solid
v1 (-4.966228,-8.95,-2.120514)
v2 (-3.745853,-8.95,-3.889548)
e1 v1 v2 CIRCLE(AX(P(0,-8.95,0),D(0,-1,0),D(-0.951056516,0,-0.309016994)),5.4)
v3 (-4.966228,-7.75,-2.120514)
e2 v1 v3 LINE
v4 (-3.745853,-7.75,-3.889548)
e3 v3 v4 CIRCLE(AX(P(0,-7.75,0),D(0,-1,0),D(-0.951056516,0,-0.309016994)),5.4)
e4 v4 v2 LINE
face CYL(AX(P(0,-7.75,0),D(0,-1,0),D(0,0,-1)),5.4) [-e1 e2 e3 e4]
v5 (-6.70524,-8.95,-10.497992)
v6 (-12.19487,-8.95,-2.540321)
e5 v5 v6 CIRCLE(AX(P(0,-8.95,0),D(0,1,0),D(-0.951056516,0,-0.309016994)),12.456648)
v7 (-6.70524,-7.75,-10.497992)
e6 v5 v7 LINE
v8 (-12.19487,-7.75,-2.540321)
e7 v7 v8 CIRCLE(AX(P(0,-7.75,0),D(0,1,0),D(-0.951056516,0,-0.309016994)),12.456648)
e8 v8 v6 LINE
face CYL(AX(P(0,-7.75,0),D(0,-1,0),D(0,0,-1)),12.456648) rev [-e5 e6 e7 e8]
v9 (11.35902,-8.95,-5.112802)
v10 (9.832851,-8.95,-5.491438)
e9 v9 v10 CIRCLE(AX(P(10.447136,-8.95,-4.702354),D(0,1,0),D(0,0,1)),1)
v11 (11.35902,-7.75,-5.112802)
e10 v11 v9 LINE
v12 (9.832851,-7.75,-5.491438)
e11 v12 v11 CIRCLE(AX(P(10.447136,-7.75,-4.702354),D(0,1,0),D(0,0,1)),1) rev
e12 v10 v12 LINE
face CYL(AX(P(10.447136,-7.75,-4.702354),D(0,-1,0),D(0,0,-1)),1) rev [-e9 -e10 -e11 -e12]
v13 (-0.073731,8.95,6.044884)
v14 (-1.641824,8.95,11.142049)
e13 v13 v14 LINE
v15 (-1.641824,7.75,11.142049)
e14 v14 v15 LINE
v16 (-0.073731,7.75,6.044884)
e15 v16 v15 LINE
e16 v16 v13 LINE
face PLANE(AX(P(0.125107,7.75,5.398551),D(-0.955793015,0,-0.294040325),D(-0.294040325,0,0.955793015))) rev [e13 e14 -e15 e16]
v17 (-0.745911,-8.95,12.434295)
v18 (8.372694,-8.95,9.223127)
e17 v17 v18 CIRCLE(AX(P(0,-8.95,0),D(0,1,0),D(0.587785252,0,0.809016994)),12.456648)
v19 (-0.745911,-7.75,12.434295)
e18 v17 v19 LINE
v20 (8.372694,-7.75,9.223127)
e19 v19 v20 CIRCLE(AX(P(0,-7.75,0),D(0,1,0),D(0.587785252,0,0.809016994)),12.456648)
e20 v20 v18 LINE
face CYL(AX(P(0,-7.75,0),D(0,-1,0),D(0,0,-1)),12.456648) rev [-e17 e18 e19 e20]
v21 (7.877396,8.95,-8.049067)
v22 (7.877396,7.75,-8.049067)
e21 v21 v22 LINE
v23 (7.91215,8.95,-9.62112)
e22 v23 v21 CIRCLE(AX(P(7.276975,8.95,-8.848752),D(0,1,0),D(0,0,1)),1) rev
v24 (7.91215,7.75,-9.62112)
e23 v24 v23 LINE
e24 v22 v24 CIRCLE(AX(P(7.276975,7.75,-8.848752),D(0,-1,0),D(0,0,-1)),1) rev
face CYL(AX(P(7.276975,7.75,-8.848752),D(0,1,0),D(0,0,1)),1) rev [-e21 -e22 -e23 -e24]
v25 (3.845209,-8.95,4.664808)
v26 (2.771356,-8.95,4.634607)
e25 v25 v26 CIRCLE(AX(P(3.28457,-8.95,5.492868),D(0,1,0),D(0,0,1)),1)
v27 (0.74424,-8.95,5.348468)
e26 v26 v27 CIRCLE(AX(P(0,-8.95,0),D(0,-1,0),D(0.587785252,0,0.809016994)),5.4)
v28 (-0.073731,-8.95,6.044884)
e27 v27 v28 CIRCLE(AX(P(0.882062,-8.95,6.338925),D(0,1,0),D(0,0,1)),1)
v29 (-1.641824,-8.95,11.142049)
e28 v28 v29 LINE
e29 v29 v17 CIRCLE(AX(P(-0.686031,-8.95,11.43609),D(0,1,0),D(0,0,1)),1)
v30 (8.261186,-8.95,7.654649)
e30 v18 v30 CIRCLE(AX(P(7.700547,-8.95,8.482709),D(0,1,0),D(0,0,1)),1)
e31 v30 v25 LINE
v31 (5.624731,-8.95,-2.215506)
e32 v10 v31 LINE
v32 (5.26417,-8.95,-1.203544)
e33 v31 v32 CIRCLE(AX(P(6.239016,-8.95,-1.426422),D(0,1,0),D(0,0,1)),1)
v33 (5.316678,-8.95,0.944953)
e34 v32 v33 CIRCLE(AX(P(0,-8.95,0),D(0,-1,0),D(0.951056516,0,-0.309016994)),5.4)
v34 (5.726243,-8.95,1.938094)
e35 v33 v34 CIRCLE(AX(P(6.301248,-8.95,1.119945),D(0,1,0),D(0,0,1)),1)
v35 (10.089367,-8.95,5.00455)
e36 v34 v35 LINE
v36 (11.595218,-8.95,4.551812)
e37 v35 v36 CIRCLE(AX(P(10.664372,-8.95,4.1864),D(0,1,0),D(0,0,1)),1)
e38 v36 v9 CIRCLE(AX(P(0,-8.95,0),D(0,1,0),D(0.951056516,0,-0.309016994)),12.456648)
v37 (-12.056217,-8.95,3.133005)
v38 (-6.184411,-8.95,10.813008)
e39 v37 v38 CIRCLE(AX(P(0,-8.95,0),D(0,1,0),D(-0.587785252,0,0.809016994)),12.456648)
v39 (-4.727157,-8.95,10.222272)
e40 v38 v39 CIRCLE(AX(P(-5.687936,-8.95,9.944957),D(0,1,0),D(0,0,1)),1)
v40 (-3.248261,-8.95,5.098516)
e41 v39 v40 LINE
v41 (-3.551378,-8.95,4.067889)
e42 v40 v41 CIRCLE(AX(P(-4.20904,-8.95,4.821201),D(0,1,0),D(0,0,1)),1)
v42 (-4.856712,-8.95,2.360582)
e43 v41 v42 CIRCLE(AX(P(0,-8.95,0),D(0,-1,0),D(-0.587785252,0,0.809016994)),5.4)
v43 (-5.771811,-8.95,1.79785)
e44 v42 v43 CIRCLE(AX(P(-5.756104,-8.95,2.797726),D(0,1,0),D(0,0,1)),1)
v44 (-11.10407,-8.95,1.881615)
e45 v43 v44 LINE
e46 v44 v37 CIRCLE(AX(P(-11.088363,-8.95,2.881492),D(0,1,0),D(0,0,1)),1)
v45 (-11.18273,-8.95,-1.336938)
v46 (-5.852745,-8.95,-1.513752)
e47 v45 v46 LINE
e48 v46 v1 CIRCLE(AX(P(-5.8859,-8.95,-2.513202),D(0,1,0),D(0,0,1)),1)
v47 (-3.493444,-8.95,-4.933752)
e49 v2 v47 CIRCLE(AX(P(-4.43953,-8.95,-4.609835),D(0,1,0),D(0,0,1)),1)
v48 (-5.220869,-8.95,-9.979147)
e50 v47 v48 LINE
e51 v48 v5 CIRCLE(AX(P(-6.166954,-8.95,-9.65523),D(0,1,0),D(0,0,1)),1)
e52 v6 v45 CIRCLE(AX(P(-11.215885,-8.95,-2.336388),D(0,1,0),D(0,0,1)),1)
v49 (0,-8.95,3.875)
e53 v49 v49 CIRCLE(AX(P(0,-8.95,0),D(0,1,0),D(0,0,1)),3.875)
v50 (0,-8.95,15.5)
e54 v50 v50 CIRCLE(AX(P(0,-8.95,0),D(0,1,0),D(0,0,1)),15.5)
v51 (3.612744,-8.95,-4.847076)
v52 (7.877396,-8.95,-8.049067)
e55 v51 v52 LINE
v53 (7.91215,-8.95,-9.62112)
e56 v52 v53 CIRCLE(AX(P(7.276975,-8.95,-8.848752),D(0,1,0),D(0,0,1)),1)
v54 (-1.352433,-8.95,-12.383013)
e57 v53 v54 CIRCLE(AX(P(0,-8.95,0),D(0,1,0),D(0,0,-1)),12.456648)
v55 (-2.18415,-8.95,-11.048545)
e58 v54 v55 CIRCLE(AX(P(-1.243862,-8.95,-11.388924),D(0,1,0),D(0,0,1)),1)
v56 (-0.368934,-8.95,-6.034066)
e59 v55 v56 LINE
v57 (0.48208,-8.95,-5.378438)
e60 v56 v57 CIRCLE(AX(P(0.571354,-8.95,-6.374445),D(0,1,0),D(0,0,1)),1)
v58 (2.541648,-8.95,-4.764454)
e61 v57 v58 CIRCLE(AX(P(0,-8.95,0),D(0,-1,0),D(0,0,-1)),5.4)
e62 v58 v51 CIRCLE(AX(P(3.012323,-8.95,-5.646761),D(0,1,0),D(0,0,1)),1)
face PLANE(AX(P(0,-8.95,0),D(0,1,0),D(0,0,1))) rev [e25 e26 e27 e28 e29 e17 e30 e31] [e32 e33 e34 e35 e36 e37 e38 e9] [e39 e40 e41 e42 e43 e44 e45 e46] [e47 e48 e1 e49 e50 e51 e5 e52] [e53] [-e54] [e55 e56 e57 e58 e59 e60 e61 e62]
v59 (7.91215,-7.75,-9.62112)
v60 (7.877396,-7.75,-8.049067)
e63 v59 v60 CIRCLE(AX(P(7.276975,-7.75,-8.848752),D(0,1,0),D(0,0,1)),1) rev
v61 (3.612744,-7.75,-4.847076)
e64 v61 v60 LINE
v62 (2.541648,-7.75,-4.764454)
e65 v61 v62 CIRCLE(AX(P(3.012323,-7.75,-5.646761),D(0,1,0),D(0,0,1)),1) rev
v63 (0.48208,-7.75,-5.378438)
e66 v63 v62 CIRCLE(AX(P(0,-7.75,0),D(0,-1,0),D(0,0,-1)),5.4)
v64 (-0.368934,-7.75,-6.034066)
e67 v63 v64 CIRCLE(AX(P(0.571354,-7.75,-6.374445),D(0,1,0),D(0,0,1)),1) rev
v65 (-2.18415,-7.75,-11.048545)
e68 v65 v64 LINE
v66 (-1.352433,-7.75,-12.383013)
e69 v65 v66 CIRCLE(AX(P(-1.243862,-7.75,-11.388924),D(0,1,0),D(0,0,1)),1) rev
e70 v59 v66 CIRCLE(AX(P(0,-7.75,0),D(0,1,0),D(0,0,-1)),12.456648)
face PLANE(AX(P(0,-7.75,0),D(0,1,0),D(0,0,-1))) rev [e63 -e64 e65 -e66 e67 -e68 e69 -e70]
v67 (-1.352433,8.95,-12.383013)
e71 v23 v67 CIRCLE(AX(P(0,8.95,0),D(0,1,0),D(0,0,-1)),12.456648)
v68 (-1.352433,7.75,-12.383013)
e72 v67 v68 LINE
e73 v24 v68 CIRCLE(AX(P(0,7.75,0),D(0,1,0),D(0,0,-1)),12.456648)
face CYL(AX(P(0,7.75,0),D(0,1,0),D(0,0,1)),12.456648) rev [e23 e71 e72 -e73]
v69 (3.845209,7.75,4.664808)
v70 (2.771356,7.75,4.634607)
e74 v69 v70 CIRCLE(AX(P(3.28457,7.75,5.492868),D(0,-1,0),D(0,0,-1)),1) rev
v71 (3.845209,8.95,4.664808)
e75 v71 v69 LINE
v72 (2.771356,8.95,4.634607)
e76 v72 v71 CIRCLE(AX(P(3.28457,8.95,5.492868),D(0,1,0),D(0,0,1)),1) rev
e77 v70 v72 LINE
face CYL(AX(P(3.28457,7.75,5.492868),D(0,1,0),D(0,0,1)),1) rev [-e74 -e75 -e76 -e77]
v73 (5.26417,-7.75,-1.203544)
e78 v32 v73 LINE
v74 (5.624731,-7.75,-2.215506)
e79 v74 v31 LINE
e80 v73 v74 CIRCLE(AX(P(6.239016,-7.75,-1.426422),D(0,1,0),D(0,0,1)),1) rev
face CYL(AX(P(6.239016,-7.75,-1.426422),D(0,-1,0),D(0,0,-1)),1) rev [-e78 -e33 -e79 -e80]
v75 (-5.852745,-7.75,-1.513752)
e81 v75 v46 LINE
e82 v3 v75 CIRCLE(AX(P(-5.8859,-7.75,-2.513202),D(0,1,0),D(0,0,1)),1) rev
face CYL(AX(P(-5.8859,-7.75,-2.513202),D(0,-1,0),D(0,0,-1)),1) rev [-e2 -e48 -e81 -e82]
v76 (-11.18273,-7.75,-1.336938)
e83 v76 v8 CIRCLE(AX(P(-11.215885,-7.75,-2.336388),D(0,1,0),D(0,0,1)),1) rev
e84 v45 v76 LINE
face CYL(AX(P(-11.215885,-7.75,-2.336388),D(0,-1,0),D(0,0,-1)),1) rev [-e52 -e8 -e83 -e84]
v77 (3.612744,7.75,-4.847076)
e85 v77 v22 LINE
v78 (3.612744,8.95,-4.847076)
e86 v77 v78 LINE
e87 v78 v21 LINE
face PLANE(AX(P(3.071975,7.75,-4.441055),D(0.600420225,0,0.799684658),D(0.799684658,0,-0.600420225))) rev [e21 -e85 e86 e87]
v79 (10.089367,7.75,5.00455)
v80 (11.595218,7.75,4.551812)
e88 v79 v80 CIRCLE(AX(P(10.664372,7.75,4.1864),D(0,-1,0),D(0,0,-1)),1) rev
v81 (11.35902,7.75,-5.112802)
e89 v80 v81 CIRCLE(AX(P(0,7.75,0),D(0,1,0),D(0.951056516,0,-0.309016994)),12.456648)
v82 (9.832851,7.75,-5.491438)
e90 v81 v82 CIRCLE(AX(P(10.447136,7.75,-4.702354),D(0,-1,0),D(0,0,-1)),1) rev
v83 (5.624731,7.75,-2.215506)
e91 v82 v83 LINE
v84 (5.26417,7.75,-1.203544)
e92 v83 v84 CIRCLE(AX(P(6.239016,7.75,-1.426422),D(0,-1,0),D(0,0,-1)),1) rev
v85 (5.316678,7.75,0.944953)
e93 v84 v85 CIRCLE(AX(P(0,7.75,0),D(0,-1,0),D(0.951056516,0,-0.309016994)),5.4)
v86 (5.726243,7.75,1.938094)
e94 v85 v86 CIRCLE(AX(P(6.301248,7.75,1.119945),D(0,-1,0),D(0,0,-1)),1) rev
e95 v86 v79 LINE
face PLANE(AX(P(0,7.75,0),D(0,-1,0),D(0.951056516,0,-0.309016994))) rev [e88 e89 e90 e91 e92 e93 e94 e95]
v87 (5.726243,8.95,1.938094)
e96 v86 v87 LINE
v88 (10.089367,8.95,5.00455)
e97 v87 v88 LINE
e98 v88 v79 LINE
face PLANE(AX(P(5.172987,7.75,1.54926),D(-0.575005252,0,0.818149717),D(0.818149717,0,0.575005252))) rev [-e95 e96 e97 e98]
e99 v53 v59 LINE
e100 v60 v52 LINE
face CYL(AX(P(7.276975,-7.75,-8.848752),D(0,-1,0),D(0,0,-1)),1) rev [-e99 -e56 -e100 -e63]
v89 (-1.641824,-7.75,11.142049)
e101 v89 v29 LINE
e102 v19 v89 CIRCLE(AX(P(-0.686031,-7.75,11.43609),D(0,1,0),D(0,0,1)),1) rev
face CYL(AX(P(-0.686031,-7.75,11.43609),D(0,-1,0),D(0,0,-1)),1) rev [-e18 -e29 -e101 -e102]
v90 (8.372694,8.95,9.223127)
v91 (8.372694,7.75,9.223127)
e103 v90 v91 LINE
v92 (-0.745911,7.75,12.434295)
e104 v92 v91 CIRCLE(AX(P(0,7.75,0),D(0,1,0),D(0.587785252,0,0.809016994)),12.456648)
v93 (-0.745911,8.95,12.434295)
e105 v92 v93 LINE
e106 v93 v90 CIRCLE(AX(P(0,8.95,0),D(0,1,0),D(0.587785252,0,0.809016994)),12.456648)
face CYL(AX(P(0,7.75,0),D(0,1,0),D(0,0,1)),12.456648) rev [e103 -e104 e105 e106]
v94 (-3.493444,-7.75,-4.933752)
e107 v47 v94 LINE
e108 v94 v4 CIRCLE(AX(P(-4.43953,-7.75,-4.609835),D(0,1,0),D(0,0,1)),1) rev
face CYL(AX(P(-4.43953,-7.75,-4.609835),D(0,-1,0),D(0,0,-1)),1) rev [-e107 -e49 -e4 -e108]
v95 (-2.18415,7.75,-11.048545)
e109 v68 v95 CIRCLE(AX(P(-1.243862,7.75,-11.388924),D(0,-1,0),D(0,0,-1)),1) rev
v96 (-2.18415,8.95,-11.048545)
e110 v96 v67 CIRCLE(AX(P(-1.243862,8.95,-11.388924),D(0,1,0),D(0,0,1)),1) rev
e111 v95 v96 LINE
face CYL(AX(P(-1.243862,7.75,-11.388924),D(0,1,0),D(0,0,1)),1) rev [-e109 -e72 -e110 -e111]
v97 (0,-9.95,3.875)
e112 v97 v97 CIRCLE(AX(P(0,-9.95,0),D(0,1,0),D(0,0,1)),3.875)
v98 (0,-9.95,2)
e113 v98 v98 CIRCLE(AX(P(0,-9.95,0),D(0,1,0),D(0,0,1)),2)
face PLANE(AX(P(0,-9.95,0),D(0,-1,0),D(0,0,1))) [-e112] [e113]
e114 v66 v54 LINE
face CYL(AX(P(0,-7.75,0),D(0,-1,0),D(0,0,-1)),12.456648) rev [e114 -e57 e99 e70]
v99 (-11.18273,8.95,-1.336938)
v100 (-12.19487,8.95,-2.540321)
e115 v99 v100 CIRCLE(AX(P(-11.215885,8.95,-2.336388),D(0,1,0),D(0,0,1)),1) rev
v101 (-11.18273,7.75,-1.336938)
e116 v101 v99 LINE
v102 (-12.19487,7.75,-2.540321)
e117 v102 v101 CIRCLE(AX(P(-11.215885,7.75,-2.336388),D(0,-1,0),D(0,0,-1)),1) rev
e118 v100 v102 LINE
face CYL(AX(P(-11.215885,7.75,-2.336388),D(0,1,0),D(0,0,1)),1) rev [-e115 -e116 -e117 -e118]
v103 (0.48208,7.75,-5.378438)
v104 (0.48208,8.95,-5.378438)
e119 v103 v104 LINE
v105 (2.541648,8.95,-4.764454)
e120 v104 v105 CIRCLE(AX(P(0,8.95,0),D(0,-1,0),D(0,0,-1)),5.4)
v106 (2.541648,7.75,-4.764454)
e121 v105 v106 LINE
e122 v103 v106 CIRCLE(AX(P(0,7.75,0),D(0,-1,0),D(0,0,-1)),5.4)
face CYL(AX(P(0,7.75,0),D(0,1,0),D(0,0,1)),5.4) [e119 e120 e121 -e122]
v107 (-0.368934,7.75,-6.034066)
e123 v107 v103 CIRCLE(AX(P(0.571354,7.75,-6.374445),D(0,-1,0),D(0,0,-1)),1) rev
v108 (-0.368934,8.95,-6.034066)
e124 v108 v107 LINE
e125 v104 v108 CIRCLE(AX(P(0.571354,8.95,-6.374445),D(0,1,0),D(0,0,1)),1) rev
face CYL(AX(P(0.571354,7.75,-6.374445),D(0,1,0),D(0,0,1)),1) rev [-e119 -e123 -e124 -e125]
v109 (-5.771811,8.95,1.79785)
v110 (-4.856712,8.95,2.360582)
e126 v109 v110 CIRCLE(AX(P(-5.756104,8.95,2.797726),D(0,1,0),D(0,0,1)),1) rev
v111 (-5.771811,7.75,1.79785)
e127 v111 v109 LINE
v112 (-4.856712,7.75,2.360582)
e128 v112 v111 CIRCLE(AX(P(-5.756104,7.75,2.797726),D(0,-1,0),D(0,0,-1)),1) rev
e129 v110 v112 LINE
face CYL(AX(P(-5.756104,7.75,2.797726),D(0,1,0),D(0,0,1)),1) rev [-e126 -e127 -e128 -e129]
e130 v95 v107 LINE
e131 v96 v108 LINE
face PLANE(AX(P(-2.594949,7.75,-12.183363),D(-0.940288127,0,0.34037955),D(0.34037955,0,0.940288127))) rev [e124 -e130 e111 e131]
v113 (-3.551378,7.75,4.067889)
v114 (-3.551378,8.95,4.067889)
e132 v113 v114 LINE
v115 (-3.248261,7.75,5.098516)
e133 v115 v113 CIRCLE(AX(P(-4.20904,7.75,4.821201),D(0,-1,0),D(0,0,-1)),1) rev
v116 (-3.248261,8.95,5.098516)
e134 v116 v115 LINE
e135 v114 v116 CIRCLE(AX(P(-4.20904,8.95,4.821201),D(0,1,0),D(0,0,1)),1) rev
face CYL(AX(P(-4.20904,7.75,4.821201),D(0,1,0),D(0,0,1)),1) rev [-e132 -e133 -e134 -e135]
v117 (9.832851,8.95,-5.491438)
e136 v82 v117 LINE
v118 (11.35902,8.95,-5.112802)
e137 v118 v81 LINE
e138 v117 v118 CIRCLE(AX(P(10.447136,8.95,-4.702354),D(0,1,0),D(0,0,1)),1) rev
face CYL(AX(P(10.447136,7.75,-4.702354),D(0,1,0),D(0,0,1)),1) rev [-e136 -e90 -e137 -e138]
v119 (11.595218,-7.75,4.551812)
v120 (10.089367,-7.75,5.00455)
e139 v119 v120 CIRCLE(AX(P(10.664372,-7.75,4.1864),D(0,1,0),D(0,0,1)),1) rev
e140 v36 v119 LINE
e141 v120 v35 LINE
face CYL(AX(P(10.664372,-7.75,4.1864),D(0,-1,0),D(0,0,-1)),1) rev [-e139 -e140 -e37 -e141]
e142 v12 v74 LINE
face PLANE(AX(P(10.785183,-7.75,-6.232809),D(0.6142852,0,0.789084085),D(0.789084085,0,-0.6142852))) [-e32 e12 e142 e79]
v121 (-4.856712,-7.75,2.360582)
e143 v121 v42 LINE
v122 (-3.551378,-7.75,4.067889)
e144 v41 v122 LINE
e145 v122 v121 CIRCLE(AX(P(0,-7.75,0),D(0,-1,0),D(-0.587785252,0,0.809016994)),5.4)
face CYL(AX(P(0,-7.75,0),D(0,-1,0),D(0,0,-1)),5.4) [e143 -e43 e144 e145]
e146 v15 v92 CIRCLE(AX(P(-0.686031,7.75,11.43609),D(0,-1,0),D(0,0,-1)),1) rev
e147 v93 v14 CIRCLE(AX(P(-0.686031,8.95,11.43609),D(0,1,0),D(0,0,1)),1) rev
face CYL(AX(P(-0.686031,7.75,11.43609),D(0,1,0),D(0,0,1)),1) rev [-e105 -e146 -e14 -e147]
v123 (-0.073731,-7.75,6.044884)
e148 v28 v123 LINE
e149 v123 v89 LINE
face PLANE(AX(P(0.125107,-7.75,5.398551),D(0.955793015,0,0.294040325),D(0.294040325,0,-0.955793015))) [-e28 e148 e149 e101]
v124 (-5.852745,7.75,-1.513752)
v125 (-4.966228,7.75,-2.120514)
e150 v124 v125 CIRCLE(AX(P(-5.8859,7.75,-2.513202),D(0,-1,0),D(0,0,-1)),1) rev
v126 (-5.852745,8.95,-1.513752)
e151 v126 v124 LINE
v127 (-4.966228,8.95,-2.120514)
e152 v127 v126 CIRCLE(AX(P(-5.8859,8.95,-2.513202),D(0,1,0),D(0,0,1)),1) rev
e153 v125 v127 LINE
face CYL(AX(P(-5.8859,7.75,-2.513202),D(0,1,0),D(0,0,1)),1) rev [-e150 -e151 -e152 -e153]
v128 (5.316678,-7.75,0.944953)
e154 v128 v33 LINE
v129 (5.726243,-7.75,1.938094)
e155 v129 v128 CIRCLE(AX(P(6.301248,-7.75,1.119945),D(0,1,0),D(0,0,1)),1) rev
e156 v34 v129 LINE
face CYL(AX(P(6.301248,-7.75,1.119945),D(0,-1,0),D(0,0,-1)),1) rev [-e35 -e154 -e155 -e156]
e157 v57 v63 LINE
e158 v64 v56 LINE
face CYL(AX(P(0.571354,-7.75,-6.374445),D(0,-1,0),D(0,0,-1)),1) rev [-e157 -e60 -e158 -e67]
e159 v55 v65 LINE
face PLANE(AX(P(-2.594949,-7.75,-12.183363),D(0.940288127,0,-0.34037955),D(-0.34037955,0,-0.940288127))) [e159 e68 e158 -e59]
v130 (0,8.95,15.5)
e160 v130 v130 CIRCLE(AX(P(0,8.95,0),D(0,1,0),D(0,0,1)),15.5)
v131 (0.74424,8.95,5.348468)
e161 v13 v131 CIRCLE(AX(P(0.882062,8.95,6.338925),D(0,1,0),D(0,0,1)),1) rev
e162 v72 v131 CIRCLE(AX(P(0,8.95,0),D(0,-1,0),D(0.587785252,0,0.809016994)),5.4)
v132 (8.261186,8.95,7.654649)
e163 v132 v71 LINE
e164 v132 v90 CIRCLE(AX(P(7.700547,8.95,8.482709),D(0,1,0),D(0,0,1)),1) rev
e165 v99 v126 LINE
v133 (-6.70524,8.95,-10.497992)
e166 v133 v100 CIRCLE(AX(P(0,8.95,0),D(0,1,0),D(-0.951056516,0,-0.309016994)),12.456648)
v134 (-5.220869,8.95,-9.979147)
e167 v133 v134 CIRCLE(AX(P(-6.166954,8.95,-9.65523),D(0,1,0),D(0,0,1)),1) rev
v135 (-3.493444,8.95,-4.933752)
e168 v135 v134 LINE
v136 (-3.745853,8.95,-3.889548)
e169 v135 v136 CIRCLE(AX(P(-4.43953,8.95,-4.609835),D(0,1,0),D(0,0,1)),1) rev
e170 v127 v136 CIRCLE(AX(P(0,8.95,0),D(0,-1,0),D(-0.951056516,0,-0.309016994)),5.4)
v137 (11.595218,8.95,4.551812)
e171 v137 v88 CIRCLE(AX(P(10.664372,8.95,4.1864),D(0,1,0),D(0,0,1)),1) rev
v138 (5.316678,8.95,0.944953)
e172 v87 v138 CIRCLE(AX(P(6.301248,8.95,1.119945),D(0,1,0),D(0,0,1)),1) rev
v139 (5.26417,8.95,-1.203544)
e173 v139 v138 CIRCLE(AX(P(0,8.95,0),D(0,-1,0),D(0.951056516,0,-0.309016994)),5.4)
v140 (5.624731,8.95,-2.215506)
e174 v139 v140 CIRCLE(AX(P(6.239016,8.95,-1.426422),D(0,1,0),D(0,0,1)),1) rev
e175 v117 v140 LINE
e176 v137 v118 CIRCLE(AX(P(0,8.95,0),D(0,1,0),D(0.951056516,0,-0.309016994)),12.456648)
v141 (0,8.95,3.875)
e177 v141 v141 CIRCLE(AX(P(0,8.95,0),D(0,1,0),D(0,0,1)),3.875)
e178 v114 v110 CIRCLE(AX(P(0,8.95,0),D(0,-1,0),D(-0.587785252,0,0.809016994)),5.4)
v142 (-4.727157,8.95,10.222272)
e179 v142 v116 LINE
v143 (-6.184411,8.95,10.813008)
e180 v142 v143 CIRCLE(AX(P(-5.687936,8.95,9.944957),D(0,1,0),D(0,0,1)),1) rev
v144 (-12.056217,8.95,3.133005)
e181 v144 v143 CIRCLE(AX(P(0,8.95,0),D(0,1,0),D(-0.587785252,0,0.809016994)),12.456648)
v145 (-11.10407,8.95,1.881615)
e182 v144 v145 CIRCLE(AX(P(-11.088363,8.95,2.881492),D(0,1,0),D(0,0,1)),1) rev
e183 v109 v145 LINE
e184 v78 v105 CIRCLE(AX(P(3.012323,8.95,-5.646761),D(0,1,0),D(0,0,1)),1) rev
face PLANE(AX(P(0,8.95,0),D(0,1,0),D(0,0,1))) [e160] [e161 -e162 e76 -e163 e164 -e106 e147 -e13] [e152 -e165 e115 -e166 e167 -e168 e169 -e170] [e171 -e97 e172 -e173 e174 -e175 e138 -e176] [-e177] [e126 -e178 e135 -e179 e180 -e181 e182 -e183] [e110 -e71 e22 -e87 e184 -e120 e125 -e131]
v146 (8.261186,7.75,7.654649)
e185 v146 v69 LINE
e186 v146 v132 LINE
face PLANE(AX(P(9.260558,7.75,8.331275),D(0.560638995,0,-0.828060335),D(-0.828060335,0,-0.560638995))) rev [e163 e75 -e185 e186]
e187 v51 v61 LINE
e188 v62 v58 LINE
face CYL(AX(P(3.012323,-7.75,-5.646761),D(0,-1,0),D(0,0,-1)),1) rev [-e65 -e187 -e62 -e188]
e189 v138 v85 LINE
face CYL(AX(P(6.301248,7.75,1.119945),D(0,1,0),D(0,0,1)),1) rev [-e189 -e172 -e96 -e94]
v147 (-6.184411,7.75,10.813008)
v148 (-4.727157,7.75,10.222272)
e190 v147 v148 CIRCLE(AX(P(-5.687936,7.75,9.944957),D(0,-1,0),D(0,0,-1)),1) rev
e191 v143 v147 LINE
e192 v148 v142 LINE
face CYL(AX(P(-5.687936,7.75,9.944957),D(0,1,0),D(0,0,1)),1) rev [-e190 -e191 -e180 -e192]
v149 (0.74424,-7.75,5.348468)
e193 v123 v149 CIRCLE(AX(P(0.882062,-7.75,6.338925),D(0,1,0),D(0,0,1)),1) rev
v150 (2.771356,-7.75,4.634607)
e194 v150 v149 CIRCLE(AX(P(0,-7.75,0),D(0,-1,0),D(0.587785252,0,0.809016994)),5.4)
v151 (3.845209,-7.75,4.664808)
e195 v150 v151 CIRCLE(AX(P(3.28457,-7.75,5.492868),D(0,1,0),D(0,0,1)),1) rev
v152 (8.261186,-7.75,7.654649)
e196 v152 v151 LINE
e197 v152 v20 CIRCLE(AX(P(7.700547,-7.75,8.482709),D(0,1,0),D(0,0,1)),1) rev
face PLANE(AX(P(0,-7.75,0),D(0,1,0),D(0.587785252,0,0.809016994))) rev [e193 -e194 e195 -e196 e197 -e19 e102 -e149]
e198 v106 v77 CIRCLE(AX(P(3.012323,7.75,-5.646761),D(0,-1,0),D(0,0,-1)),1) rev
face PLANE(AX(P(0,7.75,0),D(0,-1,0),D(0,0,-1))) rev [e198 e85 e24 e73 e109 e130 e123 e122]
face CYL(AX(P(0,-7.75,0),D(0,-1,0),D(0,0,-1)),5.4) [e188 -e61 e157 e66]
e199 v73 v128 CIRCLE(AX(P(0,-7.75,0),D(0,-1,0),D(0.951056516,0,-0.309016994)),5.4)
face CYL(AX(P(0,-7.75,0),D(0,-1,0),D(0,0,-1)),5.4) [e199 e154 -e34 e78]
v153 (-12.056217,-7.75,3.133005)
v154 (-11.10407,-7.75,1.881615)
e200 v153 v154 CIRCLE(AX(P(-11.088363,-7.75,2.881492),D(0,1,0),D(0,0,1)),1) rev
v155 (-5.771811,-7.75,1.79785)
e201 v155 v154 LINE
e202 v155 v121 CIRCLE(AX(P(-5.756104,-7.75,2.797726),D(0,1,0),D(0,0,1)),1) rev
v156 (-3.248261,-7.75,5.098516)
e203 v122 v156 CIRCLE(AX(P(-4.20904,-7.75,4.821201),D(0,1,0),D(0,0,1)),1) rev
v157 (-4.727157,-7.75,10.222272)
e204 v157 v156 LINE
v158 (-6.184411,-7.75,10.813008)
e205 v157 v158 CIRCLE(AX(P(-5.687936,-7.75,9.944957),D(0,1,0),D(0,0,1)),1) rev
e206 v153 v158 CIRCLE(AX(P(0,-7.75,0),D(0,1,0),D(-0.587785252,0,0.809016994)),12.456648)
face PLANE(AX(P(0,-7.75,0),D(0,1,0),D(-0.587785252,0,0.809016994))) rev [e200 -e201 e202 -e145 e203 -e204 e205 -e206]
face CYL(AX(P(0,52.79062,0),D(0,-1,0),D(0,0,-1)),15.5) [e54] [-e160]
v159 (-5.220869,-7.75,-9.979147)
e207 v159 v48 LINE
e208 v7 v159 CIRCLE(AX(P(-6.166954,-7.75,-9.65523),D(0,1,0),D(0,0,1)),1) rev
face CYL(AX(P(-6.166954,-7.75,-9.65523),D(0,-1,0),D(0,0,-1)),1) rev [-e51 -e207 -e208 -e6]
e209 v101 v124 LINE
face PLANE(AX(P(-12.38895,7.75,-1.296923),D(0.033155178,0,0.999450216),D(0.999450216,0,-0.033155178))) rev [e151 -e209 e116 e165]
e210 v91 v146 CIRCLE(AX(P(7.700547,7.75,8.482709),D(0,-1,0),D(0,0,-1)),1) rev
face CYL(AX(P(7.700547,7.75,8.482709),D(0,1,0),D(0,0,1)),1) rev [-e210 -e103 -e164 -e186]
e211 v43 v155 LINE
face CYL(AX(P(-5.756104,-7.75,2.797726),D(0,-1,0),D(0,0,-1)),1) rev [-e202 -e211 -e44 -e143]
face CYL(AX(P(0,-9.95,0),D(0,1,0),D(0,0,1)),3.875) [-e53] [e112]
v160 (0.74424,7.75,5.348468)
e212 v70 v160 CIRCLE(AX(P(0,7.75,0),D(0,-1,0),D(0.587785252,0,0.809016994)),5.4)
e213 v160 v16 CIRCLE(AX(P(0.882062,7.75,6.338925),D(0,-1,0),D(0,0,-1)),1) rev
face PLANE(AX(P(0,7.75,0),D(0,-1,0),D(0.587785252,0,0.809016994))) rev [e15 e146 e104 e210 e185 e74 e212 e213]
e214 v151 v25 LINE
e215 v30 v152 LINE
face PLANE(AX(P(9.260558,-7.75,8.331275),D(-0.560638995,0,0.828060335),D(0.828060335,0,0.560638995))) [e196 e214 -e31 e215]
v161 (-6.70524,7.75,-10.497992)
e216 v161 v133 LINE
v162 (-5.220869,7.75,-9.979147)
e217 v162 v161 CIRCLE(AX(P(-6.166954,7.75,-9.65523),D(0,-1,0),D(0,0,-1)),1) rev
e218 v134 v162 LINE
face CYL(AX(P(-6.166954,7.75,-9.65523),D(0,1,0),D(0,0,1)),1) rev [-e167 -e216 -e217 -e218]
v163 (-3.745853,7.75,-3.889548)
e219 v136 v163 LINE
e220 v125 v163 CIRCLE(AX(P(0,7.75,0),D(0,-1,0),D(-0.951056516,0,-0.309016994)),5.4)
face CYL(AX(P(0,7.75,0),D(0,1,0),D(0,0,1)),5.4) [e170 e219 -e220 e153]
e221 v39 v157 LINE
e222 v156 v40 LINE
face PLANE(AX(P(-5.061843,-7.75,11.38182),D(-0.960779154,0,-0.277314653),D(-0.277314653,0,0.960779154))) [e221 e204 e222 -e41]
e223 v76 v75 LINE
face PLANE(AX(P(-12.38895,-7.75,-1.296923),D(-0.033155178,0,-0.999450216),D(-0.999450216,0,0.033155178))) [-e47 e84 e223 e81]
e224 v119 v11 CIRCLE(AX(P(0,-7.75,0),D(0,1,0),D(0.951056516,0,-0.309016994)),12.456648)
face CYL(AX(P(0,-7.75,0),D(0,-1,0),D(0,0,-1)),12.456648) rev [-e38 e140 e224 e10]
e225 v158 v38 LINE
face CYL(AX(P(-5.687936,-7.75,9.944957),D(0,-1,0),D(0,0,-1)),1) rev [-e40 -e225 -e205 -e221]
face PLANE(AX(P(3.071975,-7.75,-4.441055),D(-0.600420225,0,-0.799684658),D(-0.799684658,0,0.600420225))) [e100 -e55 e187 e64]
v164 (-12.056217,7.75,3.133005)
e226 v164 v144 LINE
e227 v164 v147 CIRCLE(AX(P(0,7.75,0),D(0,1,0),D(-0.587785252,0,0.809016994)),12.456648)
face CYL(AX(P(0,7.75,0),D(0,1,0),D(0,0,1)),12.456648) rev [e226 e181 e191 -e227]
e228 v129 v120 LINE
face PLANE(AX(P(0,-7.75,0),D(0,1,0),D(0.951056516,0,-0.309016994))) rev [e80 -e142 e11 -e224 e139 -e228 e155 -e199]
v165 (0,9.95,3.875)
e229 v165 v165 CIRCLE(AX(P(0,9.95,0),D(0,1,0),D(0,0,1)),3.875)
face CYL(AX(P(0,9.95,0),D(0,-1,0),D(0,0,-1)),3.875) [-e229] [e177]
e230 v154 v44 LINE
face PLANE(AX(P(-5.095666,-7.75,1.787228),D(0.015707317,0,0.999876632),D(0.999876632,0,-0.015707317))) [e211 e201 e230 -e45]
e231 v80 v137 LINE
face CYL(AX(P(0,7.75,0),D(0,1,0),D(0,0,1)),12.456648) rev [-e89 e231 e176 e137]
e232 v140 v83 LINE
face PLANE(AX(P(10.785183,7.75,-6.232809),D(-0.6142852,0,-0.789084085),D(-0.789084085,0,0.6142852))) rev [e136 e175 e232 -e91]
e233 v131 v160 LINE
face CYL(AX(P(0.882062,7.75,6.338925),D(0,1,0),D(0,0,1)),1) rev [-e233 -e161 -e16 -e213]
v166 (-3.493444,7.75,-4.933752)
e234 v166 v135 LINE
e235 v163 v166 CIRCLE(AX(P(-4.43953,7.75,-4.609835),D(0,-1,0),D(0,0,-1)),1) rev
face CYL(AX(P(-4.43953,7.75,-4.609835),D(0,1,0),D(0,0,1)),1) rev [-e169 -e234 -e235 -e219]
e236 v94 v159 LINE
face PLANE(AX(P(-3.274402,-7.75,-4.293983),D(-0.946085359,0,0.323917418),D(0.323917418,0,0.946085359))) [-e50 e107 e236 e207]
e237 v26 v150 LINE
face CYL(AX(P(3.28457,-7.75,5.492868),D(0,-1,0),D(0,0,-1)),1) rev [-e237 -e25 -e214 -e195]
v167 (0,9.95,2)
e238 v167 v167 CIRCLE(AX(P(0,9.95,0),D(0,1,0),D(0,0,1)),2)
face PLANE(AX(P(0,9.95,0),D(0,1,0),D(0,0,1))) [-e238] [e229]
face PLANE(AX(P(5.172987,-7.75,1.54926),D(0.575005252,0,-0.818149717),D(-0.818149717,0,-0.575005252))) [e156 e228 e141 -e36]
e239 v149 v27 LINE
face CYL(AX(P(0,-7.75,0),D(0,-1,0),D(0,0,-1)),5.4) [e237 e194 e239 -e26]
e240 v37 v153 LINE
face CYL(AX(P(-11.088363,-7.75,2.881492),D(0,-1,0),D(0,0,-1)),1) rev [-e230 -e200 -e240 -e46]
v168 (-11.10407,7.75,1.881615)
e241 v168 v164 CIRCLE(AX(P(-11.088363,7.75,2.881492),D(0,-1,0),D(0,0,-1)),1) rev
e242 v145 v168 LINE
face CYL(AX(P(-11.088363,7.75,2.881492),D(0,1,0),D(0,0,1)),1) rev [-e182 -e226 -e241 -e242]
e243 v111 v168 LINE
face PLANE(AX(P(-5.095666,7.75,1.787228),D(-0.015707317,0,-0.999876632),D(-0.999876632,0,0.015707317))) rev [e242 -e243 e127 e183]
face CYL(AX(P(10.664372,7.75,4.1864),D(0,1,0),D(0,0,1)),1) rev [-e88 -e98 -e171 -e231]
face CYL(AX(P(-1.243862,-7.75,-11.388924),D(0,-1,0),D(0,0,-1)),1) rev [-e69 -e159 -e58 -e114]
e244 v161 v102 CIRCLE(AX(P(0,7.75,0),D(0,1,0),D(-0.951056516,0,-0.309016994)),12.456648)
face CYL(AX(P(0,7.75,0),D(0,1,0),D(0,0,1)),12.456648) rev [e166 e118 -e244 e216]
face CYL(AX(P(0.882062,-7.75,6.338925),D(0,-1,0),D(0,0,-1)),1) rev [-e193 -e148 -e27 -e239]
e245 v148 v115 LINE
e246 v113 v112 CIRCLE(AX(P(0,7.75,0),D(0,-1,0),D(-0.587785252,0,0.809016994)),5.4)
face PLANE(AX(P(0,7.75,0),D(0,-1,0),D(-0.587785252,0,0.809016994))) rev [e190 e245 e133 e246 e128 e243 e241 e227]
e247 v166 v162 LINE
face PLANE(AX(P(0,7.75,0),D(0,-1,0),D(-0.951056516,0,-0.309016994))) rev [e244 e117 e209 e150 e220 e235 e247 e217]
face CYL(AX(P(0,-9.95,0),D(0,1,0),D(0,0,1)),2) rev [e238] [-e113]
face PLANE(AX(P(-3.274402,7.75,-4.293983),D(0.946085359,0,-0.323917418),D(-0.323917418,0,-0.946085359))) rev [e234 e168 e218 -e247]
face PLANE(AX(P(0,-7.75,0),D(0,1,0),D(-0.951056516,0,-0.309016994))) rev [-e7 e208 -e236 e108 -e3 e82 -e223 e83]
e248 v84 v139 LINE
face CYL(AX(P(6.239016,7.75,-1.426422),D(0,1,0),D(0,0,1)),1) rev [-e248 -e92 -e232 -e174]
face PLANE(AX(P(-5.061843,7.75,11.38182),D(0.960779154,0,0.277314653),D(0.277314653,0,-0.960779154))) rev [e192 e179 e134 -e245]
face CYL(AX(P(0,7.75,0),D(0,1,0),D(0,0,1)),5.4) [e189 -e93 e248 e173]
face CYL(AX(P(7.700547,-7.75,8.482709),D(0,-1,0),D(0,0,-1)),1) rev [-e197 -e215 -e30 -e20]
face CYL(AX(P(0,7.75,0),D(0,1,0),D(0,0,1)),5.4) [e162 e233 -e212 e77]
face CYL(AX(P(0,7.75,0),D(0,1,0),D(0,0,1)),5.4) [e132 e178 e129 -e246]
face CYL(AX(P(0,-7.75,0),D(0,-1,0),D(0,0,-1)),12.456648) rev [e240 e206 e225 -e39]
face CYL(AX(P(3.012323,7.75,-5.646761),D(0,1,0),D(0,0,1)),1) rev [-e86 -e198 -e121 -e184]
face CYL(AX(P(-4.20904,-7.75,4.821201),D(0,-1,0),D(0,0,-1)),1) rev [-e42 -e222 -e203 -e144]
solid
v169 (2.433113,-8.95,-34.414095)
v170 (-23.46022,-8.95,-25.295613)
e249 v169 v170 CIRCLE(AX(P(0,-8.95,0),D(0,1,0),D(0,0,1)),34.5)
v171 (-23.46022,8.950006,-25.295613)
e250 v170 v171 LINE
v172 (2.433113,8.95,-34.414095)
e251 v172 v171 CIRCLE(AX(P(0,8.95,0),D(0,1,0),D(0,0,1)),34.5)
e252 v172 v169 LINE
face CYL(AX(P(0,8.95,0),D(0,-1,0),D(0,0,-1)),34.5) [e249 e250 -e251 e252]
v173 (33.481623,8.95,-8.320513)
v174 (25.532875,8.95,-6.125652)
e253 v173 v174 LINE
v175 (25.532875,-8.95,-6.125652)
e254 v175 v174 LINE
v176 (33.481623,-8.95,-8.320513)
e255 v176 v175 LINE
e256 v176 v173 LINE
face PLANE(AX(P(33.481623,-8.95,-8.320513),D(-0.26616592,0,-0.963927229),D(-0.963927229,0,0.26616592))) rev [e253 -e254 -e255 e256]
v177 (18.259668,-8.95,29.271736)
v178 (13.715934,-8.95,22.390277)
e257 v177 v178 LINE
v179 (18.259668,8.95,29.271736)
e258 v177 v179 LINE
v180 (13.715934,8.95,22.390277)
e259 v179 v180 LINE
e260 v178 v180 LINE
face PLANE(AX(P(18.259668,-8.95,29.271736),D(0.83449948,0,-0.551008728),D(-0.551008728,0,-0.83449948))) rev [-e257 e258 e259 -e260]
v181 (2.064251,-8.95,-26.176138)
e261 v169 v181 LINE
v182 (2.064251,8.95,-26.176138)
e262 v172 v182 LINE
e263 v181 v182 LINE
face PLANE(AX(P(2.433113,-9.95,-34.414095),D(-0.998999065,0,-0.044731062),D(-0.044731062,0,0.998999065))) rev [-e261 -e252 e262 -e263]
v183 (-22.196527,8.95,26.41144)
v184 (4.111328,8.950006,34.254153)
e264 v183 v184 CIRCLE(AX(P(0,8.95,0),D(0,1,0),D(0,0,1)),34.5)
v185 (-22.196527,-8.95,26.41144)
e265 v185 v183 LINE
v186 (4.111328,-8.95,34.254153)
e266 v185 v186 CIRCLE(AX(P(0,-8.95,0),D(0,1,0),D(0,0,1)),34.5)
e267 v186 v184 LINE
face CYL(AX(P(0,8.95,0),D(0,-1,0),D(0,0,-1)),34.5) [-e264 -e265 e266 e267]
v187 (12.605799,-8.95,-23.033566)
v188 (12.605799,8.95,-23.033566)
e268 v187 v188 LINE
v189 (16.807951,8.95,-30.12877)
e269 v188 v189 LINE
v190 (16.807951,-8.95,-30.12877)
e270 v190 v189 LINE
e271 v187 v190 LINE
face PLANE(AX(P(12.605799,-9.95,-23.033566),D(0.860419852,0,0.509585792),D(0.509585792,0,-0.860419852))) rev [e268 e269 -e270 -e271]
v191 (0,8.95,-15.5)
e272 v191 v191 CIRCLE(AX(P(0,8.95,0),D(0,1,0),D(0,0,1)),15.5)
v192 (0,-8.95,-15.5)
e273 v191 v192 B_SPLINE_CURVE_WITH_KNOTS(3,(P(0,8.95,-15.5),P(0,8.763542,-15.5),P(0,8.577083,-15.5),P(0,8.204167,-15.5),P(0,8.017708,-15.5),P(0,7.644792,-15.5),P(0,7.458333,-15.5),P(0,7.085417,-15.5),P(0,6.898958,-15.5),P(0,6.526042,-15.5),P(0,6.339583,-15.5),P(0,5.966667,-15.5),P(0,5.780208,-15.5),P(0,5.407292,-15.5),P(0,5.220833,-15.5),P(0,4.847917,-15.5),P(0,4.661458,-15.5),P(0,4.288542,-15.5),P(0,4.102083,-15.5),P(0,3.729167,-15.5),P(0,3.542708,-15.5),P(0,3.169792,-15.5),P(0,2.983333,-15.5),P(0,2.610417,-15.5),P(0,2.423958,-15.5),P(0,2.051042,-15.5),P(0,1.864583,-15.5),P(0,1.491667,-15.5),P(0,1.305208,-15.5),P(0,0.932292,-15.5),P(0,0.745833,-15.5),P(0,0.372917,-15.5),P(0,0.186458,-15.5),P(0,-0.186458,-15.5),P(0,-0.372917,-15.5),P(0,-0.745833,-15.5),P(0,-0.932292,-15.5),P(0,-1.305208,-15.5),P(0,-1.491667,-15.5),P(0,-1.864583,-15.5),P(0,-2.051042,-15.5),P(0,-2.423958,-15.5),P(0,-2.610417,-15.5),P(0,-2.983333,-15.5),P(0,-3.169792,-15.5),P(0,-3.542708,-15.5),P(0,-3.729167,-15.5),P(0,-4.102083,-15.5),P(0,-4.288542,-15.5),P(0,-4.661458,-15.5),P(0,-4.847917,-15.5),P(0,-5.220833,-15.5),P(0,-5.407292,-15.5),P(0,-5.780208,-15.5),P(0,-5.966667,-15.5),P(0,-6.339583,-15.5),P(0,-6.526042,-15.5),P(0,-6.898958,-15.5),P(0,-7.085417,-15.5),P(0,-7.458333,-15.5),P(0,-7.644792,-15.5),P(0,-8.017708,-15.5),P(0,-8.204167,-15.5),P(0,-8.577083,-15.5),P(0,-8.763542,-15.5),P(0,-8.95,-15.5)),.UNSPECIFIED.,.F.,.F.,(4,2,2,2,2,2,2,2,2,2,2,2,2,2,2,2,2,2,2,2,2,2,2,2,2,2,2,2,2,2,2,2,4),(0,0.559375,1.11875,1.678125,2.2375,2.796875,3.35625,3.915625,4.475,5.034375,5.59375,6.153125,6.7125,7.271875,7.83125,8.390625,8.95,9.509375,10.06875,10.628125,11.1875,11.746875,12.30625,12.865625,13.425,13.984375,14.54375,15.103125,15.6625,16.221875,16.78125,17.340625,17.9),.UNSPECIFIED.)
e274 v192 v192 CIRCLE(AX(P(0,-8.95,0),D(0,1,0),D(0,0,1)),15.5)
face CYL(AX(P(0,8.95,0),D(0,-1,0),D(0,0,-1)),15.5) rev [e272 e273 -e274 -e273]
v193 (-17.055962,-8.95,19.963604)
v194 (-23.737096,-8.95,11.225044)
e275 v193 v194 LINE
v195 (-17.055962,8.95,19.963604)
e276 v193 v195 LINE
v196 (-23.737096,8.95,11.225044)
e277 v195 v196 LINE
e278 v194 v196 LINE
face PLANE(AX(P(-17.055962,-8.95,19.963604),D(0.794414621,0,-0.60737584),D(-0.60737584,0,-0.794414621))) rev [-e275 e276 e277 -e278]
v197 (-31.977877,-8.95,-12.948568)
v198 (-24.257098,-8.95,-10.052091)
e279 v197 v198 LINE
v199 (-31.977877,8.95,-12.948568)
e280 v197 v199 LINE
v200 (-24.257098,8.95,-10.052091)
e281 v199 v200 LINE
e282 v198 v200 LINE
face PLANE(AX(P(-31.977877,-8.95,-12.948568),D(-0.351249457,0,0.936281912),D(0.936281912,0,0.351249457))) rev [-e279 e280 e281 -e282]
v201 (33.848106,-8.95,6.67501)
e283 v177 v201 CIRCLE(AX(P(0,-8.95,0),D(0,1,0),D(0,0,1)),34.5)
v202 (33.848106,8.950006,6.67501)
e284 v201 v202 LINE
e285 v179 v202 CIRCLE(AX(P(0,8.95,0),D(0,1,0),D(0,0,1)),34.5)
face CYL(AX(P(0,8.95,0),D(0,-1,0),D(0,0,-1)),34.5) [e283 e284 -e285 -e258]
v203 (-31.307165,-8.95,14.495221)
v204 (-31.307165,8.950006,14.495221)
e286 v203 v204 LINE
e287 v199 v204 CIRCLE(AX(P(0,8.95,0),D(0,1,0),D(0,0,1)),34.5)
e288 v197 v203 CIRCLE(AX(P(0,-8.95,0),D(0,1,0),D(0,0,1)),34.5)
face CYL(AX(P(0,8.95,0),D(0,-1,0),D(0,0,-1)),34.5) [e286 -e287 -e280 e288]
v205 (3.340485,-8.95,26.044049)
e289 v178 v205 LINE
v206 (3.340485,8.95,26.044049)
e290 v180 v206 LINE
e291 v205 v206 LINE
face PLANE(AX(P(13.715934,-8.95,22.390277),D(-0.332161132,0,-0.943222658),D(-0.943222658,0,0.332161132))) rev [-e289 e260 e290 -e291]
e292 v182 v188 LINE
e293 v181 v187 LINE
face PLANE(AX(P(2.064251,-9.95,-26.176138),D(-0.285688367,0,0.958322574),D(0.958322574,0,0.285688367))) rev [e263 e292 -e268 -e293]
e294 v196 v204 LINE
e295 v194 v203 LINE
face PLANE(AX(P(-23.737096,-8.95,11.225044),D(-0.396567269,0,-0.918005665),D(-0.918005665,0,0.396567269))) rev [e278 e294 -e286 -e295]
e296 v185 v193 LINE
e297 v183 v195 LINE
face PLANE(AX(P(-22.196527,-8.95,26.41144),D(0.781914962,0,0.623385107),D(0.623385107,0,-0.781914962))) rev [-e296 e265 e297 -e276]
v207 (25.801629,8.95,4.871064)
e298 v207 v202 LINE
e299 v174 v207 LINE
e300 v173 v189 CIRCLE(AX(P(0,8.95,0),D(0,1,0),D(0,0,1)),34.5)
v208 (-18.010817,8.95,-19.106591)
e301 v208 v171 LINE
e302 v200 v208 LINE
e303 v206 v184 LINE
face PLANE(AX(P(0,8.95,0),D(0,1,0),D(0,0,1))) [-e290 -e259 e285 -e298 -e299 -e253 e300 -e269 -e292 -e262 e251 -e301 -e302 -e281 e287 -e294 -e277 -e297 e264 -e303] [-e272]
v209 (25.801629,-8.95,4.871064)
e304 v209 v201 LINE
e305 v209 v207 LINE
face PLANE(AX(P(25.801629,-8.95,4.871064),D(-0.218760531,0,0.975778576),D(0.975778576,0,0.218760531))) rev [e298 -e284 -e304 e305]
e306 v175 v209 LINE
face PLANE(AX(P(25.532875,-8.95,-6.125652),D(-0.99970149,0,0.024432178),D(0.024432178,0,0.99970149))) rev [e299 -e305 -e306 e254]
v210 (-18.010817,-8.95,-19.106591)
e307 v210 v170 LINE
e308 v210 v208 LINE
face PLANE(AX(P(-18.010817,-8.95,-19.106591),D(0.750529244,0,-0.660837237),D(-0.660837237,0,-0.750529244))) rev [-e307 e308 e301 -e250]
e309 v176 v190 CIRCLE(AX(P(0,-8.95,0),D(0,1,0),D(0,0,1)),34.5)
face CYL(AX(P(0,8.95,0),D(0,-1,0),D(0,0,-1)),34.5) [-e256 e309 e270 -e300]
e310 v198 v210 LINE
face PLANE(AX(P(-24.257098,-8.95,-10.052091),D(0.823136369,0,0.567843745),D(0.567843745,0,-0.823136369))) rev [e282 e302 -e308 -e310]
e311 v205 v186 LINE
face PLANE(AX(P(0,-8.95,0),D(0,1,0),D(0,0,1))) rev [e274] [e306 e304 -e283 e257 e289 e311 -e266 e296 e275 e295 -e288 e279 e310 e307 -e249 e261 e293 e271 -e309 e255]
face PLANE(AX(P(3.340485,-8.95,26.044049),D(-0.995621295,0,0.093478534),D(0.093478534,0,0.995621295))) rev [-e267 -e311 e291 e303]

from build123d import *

# Parameters (mm, degrees)
SKETCH1_R                = 34.5
SKETCH1_R_2              = 15.5
BOSS_EXTRUDE1_DEPTH      = 8.95
BOSS_EXTRUDE2_START      = -8.95
SKETCH2_R                = 15.5
BOSS_EXTRUDE2_DEPTH      = 17.9
SKETCH3_R                = 3.875
BOSS_EXTRUDE3_DEPTH      = 1
CUT_EXTRUDE1_START       = 7.75
CUT_EXTRUDE1_DEPTH       = 1.2
FILLET1_R                = 1
CIRPATTERN1_COUNT        = 5
FILLET1_OF_CIRPATTERN1_R = 1
MIRROR1_START            = -8.95
MIRROR1_DEPTH            = 1.2
MIRROR1_START_2          = -9.95
MIRROR1_2_OUTLINE_R      = 3.875
MIRROR1_2_DEPTH          = 1
SKETCH5_R                = 2
CUT_EXTRUDE2_DEPTH       = 53.692599101
CUT_EXTRUDE3_DEPTH       = 53.32313064
CIRPATTERN2_COUNT        = 5


# Read off the part's stored shape, not the designer's step: Cut-Extrude1, Mirror1
with BuildPart() as part:
    # Sketch1 → Boss-Extrude1 (new, symmetric)
    with BuildSketch(Plane(origin=(0, 0, 0), x_dir=(1, 0, 0), z_dir=(0, 1, 0))):
        with Locations(Location((0, 0, 0), (0, 0, 90))):
            Circle(SKETCH1_R)
        with Locations(Location((0, 0, 0), (0, 0, 90))):
            Circle(SKETCH1_R_2, mode=Mode.SUBTRACT)
    extrude(amount=BOSS_EXTRUDE1_DEPTH, both=True)

    # Sketch6 → Cut-Extrude3 (cut, symmetric)
    with BuildSketch(Plane(origin=(0, 8.95, 0), x_dir=(1, 0, 0), z_dir=(0, 1, 0))):
        with BuildLine():
            Line((2.433112603, 34.414095412), (2.064250813, 26.176138082))
            Line((2.064250813, 26.176138082), (12.605799132, 23.03356604))
            Line((12.605799132, 23.03356604), (16.80795122, 30.128769901))
            ThreePointArc((16.80795122, 30.128769901), (9.856248675, 33.062128819), (2.433112603, 34.414095412))
        make_face()
    cut_extrude3 = extrude(amount=CUT_EXTRUDE3_DEPTH, both=True, mode=Mode.SUBTRACT)

    # CirPattern2: Cut-Extrude3 ×5 about axis
    cirpattern2_axis = Axis((0, 0, 0), (0, 1, 0))
    for i in range(1, CIRPATTERN2_COUNT):
        add(cut_extrude3.rotate(cirpattern2_axis, i * 360 / CIRPATTERN2_COUNT), mode=Mode.SUBTRACT)


with BuildPart() as body_2:
    # Sketch2 → Boss-Extrude2 (new body)
    with BuildSketch(Plane(origin=(0, 0, 0), x_dir=(1, 0, 0), z_dir=(0, 1, 0)).offset(BOSS_EXTRUDE2_START)):
        with Locations(Location((0, 0, 0), (0, 0, 270))):
            Circle(SKETCH2_R)
    extrude(amount=BOSS_EXTRUDE2_DEPTH)

    # Sketch3 → Boss-Extrude3 (add)
    with BuildSketch(Plane(origin=(0, 8.95, 0), x_dir=(1, 0, 0), z_dir=(0, 1, 0))):
        with Locations(Location((0, 0, 0), (0, 0, 270))):
            Circle(SKETCH3_R)
    extrude(amount=BOSS_EXTRUDE3_DEPTH)

    # Cut-Extrude1 outline → Cut-Extrude1 (cut)
    with BuildSketch(Plane(origin=(0, 0, 0), x_dir=(1, 0, 0), z_dir=(0, 1, 0)).offset(CUT_EXTRUDE1_START)):
        with BuildLine():
            Line((3.071974537, 4.44105533), (8.842521572, 8.773704599))
            ThreePointArc((8.842521572, 8.773704599), (3.558719439, 11.93748701), (-2.59494852, 12.183362521))
            Line((-2.59494852, 12.183362521), (-0.138760092, 5.398216894))
            ThreePointArc((-0.138760092, 5.398216894), (1.542717184, 5.174941902), (3.071974537, 4.44105533))
        make_face()
    cut_extrude1 = extrude(amount=CUT_EXTRUDE1_DEPTH, mode=Mode.SUBTRACT)

    # Fillet1
    fillet1_edges = [body_2.edges().sort_by_distance(p)[0] for p in [
        (-2.59494852, 8.35, -12.183362521),
        (8.842521572, 8.35, -8.773704599),
        (3.071974537, 8.35, -4.44105533),
        (-0.138760092, 8.35, -5.398216894),
    ]]
    fillet(fillet1_edges, radius=FILLET1_R)

    # CirPattern1: Cut-Extrude1 ×5 about axis
    cirpattern1_axis = Axis((0, 0, 0), (0, 1, 0))
    for i in range(1, CIRPATTERN1_COUNT):
        add(cut_extrude1.rotate(cirpattern1_axis, i * 360 / CIRPATTERN1_COUNT), mode=Mode.SUBTRACT)

    # Fillet1 of CirPattern1
    fillet1_of_cirpattern1_edges = [body_2.edges().sort_by_distance(p)[0] for p in [
        (-12.388949508, 8.35, -1.296923368),
        (-5.611799492, 8.35, -11.120961586),
        (-3.274402273, 8.35, -4.293982971),
        (-5.17688858, 8.35, -1.53617207),
        (-5.061843361, 8.35, 11.381819799),
        (-12.310804396, 8.35, 1.900572351),
        (-5.095666434, 8.35, 1.787227907),
        (-3.060733006, 8.35, 4.448810342),
        (9.260558265, 8.35, 8.331274858),
        (-1.996696054, 8.35, 12.295579897),
        (0.125107221, 8.35, 5.398550563),
        (3.285251552, 8.35, 4.285688071),
        (10.785183124, 8.35, -6.232808767),
        (11.07677837, 8.35, 5.698513937),
        (5.172986949, 8.35, 1.549259831),
        (5.091130127, 8.35, -1.800109449),
    ]]
    fillet(fillet1_of_cirpattern1_edges, radius=FILLET1_OF_CIRPATTERN1_R)

    # Mirror1 outline → Mirror1 (cut)
    with BuildSketch(Plane(origin=(0, 0, 0), x_dir=(1, 0, 0), z_dir=(0, 1, 0)).offset(MIRROR1_START)):
        with BuildLine():
            ThreePointArc((7.912150219, 9.621120468), (3.558719439, 11.93748701), (-1.352433209, 12.383012742))
            ThreePointArc((-1.352433209, 12.383012742), (-2.092524389, 11.917859003), (-2.184150137, 11.048544516))
            Line((-2.184150137, 11.048544516), (-0.368934217, 6.034065893))
            ThreePointArc((-0.368934217, 6.034065893), (-0.03894228, 5.582272129), (0.482079862, 5.378438343))
            ThreePointArc((0.482079862, 5.378438343), (1.542717184, 5.174941902), (2.541647812, 4.764454471))
            ThreePointArc((2.541647812, 4.764454471), (3.089232431, 4.649722745), (3.612743558, 4.847076195))
            Line((3.612743558, 4.847076195), (7.87739554, 8.049067477))
            ThreePointArc((7.87739554, 8.049067477), (8.276731026, 8.826649707), (7.912150219, 9.621120468))
        make_face()
        with BuildLine():
            ThreePointArc((-0.745911268, -12.434295176), (4.137614309, -11.749392664), (8.372693719, -9.223127455))
            ThreePointArc((8.372693719, -9.223127455), (8.698029553, -8.411795494), (8.261186105, -7.654649037))
            Line((8.261186105, -7.654649037), (3.845208994, -4.664807761))
            ThreePointArc((3.845208994, -4.664807761), (3.312682197, -4.493263322), (2.771355937, -4.634607456))
            ThreePointArc((2.771355937, -4.634607456), (1.793670112, -5.093402353), (0.7442398, -5.348467736))
            ThreePointArc((0.7442398, -5.348467736), (0.233796921, -5.577509984), (-0.07373103, -6.044884399))
            Line((-0.07373103, -6.044884399), (-1.641823706, -11.142049303))
            ThreePointArc((-1.641823706, -11.142049303), (-1.507841533, -12.005850051), (-0.745911268, -12.434295176))
        make_face()
        with BuildLine():
            ThreePointArc((11.595218195, -4.551812294), (12.452929594, 0.304343044), (11.359020114, 5.112801795))
            ThreePointArc((11.359020114, 5.112801795), (10.687931868, 5.672929924), (9.832850747, 5.491438239))
            Line((9.832850747, 5.491438239), (5.624730745, 2.215506197))
            ThreePointArc((5.624730745, 2.215506197), (5.297022457, 1.762053264), (5.264169703, 1.203543657))
            ThreePointArc((5.264169703, 1.203543657), (5.398388045, 0.131933762), (5.316677838, -0.944953313))
            ThreePointArc((5.316677838, -0.944953313), (5.376774436, -1.501191286), (5.726242556, -1.938094385))
            Line((5.726242556, -1.938094385), (10.089367167, -5.004549721))
            ThreePointArc((10.089367167, -5.004549721), (10.952293266, -5.144054213), (11.595218195, -4.551812294))
        make_face()
        with BuildLine():
            ThreePointArc((-12.056216711, -3.133004751), (-9.895743318, -7.565867058), (-6.184410819, -10.813008045))
            ThreePointArc((-6.184410819, -10.813008045), (-5.312253969, -10.871705446), (-4.727156947, -10.222271516))
            Line((-4.727156947, -10.222271516), (-3.248260892, -5.098515944))
            ThreePointArc((-3.248260892, -5.098515944), (-3.249672266, -4.539042717), (-3.551377539, -4.067888589))
            ThreePointArc((-3.551377539, -4.067888589), (-4.289838951, -3.279829535), (-4.856712346, -2.360581535))
            ThreePointArc((-4.856712346, -2.360581535), (-5.232279993, -1.945899456), (-5.771810839, -1.797849632))
            Line((-5.771810839, -1.797849632), (-11.104070021, -1.881615453))
            ThreePointArc((-11.104070021, -1.881615453), (-11.884190583, -2.275969182), (-12.056216711, -3.133004751))
        make_face()
        with BuildLine():
            ThreePointArc((-6.705240435, 10.497991753), (-10.253520024, 7.073429668), (-12.194869805, 2.540320962))
            ThreePointArc((-12.194869805, 2.540320962), (-11.981183062, 1.692712013), (-11.182729768, 1.336937798))
            Line((-11.182729768, 1.336937798), (-5.85274463, 1.513751615))
            ThreePointArc((-5.85274463, 1.513751615), (-5.32109011, 1.687980646), (-4.966227963, 2.120514045))
            ThreePointArc((-4.966227963, 2.120514045), (-4.44493639, 3.066356223), (-3.745853103, 3.889548114))
            ThreePointArc((-3.745853103, 3.889548114), (-3.467523795, 4.374877982), (-3.493444245, 4.93375222))
            Line((-3.493444245, 4.93375222), (-5.220868981, 9.979146999))
            ThreePointArc((-5.220868981, 9.979146999), (-5.836992176, 10.599223739), (-6.705240435, 10.497991753))
        make_face()
    extrude(amount=MIRROR1_DEPTH, mode=Mode.SUBTRACT)

    # Mirror1 2 outline → Mirror1 2 (add)
    with BuildSketch(Plane(origin=(0, 0, 0), x_dir=(1, 0, 0), z_dir=(0, 1, 0)).offset(MIRROR1_START_2)):
        Circle(MIRROR1_2_OUTLINE_R)
    extrude(amount=MIRROR1_2_DEPTH)

    # Sketch5 → Cut-Extrude2 (cut, through all)
    with BuildSketch(Plane(origin=(0, 9.95, 0), x_dir=(1, 0, 0), z_dir=(0, 1, 0))):
        with Locations(Location((0, 0, 0), (0, 0, 270))):
            Circle(SKETCH5_R)
    extrude(amount=-CUT_EXTRUDE2_DEPTH, mode=Mode.SUBTRACT)


solid = Compound([part.part, body_2.part])
